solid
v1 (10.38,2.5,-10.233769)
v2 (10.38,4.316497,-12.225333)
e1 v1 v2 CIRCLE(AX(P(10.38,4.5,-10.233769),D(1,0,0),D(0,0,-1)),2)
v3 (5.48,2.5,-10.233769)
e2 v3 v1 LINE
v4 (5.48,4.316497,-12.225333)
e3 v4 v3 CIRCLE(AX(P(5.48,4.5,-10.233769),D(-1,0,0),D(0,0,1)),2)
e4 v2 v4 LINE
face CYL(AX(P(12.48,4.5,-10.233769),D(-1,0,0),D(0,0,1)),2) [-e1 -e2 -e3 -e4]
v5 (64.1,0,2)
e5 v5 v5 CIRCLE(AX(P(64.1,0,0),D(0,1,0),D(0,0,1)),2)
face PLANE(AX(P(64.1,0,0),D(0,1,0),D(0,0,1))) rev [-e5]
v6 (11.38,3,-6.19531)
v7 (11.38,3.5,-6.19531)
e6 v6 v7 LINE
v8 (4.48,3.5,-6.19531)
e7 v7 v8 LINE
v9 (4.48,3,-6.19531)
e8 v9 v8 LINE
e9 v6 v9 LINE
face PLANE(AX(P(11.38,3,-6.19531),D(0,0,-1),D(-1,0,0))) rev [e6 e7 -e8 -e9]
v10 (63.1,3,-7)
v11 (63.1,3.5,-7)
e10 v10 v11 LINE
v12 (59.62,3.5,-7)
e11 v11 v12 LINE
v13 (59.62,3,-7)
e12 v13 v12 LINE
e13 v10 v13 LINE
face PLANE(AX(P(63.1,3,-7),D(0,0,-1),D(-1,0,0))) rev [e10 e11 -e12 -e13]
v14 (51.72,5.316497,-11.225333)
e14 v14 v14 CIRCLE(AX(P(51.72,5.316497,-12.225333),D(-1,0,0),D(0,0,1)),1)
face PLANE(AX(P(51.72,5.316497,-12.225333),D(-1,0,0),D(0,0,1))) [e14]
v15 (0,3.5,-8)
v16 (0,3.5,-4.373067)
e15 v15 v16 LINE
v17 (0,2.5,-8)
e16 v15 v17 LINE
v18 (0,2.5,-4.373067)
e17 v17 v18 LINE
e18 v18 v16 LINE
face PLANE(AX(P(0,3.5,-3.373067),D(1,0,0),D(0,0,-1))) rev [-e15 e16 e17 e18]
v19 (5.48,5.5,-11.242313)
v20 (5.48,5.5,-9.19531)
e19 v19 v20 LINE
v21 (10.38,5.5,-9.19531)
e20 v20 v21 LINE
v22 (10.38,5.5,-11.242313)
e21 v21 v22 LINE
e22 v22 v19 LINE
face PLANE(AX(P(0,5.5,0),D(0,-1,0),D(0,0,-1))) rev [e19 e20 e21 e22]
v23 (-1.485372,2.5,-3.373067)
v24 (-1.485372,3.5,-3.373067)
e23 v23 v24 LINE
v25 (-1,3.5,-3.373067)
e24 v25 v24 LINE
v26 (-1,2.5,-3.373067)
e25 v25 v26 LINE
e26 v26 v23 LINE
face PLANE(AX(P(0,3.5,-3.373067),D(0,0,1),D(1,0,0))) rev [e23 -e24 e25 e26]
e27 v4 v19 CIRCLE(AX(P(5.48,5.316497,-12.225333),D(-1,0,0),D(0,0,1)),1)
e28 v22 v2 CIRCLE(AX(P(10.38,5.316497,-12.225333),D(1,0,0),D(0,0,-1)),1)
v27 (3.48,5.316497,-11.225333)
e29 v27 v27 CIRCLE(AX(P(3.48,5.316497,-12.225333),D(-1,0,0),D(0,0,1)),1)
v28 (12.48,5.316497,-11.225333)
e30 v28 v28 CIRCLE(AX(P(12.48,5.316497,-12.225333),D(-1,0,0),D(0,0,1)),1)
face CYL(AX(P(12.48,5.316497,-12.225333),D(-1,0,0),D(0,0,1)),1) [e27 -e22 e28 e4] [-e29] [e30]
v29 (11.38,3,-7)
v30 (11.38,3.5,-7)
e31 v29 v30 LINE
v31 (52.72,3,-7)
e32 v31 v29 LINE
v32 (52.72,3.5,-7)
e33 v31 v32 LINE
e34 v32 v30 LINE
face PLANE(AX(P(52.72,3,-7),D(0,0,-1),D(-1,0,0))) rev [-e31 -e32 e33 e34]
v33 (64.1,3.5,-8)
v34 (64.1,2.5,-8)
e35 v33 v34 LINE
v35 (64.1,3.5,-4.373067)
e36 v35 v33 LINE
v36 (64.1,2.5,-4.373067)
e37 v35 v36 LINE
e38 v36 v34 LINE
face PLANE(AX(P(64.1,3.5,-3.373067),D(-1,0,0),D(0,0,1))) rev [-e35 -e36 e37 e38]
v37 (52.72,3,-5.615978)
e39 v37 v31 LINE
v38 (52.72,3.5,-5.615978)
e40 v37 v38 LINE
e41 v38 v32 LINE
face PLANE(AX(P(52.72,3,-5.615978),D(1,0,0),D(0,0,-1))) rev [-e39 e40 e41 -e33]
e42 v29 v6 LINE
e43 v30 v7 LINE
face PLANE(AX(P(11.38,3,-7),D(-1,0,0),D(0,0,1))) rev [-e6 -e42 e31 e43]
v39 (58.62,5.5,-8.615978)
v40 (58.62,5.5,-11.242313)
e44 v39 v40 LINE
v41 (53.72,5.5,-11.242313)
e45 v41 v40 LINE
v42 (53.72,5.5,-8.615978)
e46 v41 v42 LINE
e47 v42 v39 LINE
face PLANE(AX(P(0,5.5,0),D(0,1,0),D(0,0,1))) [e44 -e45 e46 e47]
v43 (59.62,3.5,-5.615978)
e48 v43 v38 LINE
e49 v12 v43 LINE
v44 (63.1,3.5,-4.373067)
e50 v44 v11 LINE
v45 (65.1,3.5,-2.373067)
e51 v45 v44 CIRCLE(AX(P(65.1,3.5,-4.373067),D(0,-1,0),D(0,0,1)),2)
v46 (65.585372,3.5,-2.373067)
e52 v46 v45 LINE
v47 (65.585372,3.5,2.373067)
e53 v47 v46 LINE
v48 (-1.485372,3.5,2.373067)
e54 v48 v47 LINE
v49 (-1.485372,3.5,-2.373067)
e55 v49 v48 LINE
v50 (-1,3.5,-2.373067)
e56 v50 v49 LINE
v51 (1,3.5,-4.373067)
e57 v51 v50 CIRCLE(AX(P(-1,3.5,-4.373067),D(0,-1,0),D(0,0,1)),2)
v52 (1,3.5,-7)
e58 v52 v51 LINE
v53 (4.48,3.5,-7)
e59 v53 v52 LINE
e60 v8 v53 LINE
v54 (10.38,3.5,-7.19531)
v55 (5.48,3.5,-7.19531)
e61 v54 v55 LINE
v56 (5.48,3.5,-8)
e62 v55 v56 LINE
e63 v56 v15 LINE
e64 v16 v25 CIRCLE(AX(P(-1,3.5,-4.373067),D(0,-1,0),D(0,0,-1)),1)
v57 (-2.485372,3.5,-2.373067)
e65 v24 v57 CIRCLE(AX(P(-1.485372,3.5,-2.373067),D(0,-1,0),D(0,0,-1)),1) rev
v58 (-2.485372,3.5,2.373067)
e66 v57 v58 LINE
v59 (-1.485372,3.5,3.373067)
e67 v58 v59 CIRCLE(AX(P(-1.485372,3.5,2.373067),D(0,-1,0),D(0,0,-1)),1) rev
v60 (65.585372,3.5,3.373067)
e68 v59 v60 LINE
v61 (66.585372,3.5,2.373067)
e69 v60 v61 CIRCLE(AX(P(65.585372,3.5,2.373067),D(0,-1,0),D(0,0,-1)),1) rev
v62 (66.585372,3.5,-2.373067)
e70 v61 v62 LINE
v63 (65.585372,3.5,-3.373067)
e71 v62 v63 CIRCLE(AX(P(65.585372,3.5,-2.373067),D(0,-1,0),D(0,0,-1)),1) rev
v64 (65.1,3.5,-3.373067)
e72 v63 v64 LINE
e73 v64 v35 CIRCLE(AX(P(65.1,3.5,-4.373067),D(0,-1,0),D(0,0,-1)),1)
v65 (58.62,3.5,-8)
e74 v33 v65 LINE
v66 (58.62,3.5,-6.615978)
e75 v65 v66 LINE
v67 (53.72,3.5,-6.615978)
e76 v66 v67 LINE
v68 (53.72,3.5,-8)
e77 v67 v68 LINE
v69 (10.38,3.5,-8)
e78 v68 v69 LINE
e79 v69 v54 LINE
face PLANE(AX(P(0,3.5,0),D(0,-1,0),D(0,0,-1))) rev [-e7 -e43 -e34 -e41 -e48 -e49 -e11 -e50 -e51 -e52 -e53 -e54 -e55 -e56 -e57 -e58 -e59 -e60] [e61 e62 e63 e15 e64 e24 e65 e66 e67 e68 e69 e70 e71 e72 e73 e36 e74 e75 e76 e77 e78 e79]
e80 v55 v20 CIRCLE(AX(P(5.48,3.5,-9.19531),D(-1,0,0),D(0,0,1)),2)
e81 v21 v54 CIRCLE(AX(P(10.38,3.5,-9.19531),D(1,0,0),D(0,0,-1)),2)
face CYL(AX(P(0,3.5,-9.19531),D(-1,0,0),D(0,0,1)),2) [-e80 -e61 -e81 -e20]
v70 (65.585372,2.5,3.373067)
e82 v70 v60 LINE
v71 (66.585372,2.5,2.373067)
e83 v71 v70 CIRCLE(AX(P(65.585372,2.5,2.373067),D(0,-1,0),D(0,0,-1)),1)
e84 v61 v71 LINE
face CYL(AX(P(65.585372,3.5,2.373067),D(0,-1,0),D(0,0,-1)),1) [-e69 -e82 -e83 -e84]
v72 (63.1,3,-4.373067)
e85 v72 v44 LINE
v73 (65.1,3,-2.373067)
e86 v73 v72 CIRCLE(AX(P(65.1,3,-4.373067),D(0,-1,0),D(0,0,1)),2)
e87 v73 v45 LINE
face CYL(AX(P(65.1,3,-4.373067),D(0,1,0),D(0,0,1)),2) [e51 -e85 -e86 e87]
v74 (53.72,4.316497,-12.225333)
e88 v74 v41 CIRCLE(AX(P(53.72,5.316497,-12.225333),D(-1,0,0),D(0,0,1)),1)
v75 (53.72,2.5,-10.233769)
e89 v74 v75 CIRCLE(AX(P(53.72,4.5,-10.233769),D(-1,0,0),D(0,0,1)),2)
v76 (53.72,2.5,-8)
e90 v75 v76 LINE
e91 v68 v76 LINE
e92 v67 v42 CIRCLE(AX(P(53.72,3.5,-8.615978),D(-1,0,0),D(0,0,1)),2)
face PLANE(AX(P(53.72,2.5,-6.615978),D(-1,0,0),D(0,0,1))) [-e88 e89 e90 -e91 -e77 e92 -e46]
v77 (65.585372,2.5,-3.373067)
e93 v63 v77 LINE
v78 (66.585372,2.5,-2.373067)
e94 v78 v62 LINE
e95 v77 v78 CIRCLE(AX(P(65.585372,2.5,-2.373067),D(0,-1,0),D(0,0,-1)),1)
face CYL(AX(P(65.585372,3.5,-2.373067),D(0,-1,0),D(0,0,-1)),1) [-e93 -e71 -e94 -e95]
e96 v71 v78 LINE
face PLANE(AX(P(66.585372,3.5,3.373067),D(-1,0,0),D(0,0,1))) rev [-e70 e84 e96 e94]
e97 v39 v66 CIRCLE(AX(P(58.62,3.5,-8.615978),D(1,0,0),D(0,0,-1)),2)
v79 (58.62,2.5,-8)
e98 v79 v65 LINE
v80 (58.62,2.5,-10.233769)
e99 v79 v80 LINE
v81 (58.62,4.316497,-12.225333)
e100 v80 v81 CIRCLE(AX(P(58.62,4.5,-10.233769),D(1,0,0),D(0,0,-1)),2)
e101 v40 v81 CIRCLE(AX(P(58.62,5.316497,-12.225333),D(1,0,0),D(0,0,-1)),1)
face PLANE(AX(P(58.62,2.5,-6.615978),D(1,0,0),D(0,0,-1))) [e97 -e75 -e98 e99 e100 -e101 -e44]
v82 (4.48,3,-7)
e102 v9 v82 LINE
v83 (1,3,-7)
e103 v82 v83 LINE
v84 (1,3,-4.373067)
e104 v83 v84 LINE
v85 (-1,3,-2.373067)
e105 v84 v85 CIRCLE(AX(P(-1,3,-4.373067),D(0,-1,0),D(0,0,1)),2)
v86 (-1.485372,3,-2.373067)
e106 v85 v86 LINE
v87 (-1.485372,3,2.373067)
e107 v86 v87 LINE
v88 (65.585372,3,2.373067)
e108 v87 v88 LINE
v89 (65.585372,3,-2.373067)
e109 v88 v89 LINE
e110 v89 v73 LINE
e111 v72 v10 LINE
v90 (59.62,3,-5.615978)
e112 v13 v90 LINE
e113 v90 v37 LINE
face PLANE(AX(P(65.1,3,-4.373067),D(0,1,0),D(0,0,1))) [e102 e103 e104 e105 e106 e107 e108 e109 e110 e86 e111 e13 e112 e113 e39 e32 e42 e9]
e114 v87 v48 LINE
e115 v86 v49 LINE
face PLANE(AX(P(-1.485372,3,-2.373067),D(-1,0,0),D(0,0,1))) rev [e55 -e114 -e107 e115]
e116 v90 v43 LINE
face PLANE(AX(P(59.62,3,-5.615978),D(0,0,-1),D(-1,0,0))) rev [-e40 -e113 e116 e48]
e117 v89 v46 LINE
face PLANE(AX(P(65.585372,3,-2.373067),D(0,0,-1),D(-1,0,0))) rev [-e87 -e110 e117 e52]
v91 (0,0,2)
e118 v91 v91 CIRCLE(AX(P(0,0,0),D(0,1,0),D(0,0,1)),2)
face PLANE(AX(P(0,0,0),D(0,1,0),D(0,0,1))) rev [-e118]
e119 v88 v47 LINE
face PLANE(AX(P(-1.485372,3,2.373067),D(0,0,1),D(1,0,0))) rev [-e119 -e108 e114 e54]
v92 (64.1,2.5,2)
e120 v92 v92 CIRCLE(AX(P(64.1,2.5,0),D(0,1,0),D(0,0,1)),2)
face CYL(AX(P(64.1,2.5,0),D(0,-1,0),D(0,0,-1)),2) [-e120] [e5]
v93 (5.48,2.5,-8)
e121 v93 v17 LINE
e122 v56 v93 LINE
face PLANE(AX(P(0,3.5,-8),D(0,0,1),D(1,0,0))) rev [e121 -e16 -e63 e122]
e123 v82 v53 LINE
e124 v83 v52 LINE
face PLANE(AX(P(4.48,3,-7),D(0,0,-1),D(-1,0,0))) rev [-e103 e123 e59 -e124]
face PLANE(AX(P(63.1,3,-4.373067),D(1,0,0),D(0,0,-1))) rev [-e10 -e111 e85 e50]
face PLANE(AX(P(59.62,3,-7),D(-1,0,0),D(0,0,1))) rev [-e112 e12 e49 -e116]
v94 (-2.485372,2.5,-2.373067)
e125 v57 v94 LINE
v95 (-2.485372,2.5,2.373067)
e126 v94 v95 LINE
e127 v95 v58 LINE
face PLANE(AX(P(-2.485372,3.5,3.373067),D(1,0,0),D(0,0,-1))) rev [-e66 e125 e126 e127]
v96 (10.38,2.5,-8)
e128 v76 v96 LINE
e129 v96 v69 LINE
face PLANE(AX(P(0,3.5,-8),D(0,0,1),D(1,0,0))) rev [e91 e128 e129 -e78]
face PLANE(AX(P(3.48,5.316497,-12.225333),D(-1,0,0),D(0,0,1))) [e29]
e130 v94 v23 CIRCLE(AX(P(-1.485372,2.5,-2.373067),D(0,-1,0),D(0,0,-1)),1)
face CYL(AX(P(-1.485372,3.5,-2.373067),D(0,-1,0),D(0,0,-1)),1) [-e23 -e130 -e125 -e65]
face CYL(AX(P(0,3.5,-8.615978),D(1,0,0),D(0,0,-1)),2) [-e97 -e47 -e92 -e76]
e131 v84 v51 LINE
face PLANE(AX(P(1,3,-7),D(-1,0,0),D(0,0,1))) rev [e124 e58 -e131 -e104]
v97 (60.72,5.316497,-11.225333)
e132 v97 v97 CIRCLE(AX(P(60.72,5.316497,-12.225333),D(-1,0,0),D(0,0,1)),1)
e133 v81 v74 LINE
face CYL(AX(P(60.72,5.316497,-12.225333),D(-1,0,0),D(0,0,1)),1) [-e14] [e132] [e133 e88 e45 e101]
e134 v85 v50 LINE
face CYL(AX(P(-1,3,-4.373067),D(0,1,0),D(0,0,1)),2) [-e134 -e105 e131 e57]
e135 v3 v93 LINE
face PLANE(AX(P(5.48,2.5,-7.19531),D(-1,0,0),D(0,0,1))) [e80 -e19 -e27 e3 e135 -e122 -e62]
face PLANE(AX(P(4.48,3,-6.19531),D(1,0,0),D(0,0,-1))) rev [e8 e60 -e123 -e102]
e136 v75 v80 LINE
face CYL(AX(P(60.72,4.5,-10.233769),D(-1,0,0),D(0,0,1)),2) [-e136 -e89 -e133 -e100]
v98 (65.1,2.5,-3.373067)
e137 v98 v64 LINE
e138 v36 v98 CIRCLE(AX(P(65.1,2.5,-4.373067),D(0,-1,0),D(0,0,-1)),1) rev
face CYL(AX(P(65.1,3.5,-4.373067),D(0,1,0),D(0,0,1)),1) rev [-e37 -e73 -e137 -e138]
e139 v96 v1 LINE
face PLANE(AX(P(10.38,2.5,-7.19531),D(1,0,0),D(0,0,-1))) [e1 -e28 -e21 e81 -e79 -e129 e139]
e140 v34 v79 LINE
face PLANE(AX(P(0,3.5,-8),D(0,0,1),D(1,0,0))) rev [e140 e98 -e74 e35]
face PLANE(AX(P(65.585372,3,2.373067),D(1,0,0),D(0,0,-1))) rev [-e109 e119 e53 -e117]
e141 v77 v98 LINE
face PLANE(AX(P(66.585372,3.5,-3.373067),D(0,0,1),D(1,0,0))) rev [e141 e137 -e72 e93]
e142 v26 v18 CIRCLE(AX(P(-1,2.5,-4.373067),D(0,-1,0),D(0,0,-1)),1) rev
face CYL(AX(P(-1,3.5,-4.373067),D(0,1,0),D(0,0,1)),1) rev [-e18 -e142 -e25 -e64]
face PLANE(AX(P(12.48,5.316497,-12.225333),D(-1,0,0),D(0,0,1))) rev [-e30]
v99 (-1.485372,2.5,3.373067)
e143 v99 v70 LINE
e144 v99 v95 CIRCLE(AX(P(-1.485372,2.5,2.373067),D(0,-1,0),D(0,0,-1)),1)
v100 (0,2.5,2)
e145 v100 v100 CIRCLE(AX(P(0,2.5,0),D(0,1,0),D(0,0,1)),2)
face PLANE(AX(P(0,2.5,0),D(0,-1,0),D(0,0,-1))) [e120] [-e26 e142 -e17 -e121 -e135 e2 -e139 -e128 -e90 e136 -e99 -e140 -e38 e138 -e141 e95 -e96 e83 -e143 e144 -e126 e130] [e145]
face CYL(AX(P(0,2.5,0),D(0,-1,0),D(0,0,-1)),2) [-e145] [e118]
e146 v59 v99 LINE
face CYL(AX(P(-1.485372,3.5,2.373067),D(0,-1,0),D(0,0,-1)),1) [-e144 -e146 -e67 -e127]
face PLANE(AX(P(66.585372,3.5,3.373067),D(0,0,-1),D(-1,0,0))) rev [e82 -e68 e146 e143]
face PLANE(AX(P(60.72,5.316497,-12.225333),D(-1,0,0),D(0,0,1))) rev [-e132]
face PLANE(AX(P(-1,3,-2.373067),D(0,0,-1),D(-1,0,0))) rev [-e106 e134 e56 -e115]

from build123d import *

# Parameters (mm, degrees)
SKETCH1_R                = 2
BOSS_EXTRUDE1_DEPTH      = 2.5
BOSS_EXTRUDE1_2_DEPTH    = 2.5
BOSS_EXTRUDE3_DEPTH      = 1
FILLET1_R                = 1
BOSS_EXTRUDE4_DEPTH      = 2
BOSS_EXTRUDE4_DEPTH_BACK = 1
SKETCH3_W                = 4.9
SKETCH3_H                = 5.030022666
SKETCH3_H_2              = 5.609354891
BOSS_EXTRUDE5_DEPTH      = 2
BOSS_EXTRUDE5_DEPTH_BACK = 7
SKETCH4_R                = 1
BOSS_EXTRUDE6_DEPTH      = 2
BOSS_EXTRUDE6_DEPTH_BACK = 7
SKETCH5_R                = 1
FILLET2_R                = 2
FILLET3_R                = 2
CUT_EXTRUDE1_DEPTH       = 0.5
FILLET4_R                = 2


# Some blends are built 0.0001 mm under size
with BuildPart() as part:
    # Sketch1 → Boss-Extrude1 (new body)
    with BuildSketch(Plane(origin=(0, 0, 0), x_dir=(1, 0, 0), z_dir=(0, 1, 0))):
        with Locations(Location((64.1, 0, 0), (0, 0, 270))):
            Circle(SKETCH1_R)
    extrude(amount=BOSS_EXTRUDE1_DEPTH)



with BuildPart() as body_2:
    # Sketch1 → Boss-Extrude1 2 (new body)
    with BuildSketch(Plane(origin=(0, 0, 0), x_dir=(1, 0, 0), z_dir=(0, 1, 0))):
        with Locations(Location((0, 0, 0), (0, 0, 270))):
            Circle(SKETCH1_R)
    extrude(amount=BOSS_EXTRUDE1_2_DEPTH)


with BuildPart() as part_1:
    add(part.part)

    add(body_2.part)  # Boss-Extrude3 merges body 2
    # Sketch2 → Boss-Extrude3 (add)
    with BuildSketch(Plane(origin=(0, 2.5, 0), x_dir=(1, 0, 0), z_dir=(0, 1, 0))):
        Polygon((0, 3.373067478), (0, 8), (64.1, 8), (64.1, 3.373067478), (66.585371827, 3.373067478), (66.585371827, -3.373067478), (-2.485371827, -3.373067478), (-2.485371827, 3.373067478), align=None)
    extrude(amount=BOSS_EXTRUDE3_DEPTH)

    # Fillet1
    fillet1_edges = [part_1.edges().sort_by_distance(p)[0] for p in [
        (64.1, 3, -3.373067478),
        (0, 3, -3.373067478),
        (-2.485371827, 3, -3.373067478),
        (-2.485371827, 3, 3.373067478),
        (66.585371827, 3, 3.373067478),
        (66.585371827, 3, -3.373067478),
    ]]
    fillet(fillet1_edges, radius=FILLET1_R)

    # Sketch3 → Boss-Extrude4 (add, two sides: drawn at the far end of the back side and taken through both)
    with BuildSketch(Plane(origin=(0, 3.5, 0), x_dir=(1, 0, 0), z_dir=(0, 1, 0)).offset(-BOSS_EXTRUDE4_DEPTH_BACK)):
        with Locations((7.93, 9.710321272)):
            Rectangle(SKETCH3_W, SKETCH3_H)
        with Locations((56.17, 9.42065516)):
            Rectangle(SKETCH3_W, SKETCH3_H_2)
    extrude(amount=BOSS_EXTRUDE4_DEPTH + BOSS_EXTRUDE4_DEPTH_BACK)

    # Sketch4 → Boss-Extrude5 (add, two sides: drawn at the far end of the back side and taken through both)
    with BuildSketch(Plane.ZY.offset(-5.48).offset(-BOSS_EXTRUDE5_DEPTH_BACK)):
        with Locations((-12.225332605, 5.316497078)):
            Circle(SKETCH4_R)
    extrude(amount=BOSS_EXTRUDE5_DEPTH + BOSS_EXTRUDE5_DEPTH_BACK)

    # Sketch5 → Boss-Extrude6 (add, two sides: drawn at the far end of the back side and taken through both)
    with BuildSketch(Plane.ZY.offset(-53.72).offset(-BOSS_EXTRUDE6_DEPTH_BACK)):
        with Locations((-12.225332605, 5.316497078)):
            Circle(SKETCH5_R)
    extrude(amount=BOSS_EXTRUDE6_DEPTH + BOSS_EXTRUDE6_DEPTH_BACK)

    # Fillet2
    fillet2_edges = [part_1.edges().sort_by_distance(p)[0] for p in [
        (56.17, 5.5, -6.615977714),
        (7.93, 5.5, -7.195309939),
    ]]
    fillet(fillet2_edges, radius=FILLET2_R - 0.0001)  # a hair under: the kernel refuses the full size

    # Fillet3
    # the kernel refuses this fillet: 2 mm, written as the material it takes off along each edge
    with BuildSketch(Plane(origin=(48.741090307, 2.5, -12.225332605), x_dir=(0, 0, 1), z_dir=(1, 0, 0))) as fillet3_piece_1:
        with BuildLine():
            CenterArc((1.991563877, -2), FILLET3_R, 90, 84.735624625)
            Line((0, -1.816497078), (-0.039831278, -1.81282702))
            ThreePointArc((-0.039831278, -1.81282702), (-0.04, -0.908248539), (-0.04, 0))
            Line((-0.04, 0), (0, 0.04))
            Line((0, 0.04), (1.991563877, 0.04))
            Line((1.991563877, 0.04), (1.991563877, 0))
        make_face()
    extrude(amount=14.857819387, mode=Mode.SUBTRACT)

    # Sketch6 → Cut-Extrude1 (cut)
    with BuildSketch(Plane(origin=(0, 3.5, 0), x_dir=(1, 0, 0), z_dir=(0, 1, 0))):
        with BuildLine():
            Line((59.62, 5.615977714), (52.72, 5.615977714))
            Line((52.72, 5.615977714), (52.72, 7))
            Line((52.72, 7), (11.38, 7))
            Line((11.38, 7), (11.38, 6.195309939))
            Line((11.38, 6.195309939), (4.48, 6.195309939))
            Line((4.48, 6.195309939), (4.48, 7))
            Line((4.48, 7), (1, 7))
            Line((1, 7), (1, 4.373067478))
            ThreePointArc((1, 4.373067478), (0.414213562, 2.958853916), (-1, 2.373067478))
            Line((-1, 2.373067478), (-1.485371827, 2.373067478))
            Line((-1.485371827, 2.373067478), (-1.485371827, -2.373067478))
            Line((-1.485371827, -2.373067478), (65.585371827, -2.373067478))
            Line((65.585371827, -2.373067478), (65.585371827, 2.373067478))
            Line((65.585371827, 2.373067478), (65.1, 2.373067478))
            ThreePointArc((65.1, 2.373067478), (63.685786438, 2.958853916), (63.1, 4.373067478))
            Line((63.1, 4.373067478), (63.1, 7))
            Line((63.1, 7), (59.62, 7))
            Line((59.62, 7), (59.62, 5.615977714))
        make_face()
    extrude(amount=-CUT_EXTRUDE1_DEPTH, mode=Mode.SUBTRACT)

    # Fillet4
    # the kernel refuses this fillet: 2 mm, written as the material it takes off along each edge
    with BuildSketch(Plane(origin=(15.358909693, 2.5, -12.225332605), x_dir=(0, 0, 1), z_dir=(-1, 0, 0))) as fillet4_piece_1:
        with BuildLine():
            CenterArc((1.991563877, 2), FILLET4_R, 185.264375375, 84.735624625)
            Line((0, 1.816497078), (-0.039831278, 1.81282702))
            ThreePointArc((-0.039831278, 1.81282702), (-0.04, 0.908248539), (-0.04, 0))
            Line((-0.04, 0), (0, -0.04))
            Line((0, -0.04), (1.991563877, -0.04))
            Line((1.991563877, -0.04), (1.991563877, 0))
        make_face()
    extrude(amount=14.857819387, mode=Mode.SUBTRACT)


solid = part_1.part
